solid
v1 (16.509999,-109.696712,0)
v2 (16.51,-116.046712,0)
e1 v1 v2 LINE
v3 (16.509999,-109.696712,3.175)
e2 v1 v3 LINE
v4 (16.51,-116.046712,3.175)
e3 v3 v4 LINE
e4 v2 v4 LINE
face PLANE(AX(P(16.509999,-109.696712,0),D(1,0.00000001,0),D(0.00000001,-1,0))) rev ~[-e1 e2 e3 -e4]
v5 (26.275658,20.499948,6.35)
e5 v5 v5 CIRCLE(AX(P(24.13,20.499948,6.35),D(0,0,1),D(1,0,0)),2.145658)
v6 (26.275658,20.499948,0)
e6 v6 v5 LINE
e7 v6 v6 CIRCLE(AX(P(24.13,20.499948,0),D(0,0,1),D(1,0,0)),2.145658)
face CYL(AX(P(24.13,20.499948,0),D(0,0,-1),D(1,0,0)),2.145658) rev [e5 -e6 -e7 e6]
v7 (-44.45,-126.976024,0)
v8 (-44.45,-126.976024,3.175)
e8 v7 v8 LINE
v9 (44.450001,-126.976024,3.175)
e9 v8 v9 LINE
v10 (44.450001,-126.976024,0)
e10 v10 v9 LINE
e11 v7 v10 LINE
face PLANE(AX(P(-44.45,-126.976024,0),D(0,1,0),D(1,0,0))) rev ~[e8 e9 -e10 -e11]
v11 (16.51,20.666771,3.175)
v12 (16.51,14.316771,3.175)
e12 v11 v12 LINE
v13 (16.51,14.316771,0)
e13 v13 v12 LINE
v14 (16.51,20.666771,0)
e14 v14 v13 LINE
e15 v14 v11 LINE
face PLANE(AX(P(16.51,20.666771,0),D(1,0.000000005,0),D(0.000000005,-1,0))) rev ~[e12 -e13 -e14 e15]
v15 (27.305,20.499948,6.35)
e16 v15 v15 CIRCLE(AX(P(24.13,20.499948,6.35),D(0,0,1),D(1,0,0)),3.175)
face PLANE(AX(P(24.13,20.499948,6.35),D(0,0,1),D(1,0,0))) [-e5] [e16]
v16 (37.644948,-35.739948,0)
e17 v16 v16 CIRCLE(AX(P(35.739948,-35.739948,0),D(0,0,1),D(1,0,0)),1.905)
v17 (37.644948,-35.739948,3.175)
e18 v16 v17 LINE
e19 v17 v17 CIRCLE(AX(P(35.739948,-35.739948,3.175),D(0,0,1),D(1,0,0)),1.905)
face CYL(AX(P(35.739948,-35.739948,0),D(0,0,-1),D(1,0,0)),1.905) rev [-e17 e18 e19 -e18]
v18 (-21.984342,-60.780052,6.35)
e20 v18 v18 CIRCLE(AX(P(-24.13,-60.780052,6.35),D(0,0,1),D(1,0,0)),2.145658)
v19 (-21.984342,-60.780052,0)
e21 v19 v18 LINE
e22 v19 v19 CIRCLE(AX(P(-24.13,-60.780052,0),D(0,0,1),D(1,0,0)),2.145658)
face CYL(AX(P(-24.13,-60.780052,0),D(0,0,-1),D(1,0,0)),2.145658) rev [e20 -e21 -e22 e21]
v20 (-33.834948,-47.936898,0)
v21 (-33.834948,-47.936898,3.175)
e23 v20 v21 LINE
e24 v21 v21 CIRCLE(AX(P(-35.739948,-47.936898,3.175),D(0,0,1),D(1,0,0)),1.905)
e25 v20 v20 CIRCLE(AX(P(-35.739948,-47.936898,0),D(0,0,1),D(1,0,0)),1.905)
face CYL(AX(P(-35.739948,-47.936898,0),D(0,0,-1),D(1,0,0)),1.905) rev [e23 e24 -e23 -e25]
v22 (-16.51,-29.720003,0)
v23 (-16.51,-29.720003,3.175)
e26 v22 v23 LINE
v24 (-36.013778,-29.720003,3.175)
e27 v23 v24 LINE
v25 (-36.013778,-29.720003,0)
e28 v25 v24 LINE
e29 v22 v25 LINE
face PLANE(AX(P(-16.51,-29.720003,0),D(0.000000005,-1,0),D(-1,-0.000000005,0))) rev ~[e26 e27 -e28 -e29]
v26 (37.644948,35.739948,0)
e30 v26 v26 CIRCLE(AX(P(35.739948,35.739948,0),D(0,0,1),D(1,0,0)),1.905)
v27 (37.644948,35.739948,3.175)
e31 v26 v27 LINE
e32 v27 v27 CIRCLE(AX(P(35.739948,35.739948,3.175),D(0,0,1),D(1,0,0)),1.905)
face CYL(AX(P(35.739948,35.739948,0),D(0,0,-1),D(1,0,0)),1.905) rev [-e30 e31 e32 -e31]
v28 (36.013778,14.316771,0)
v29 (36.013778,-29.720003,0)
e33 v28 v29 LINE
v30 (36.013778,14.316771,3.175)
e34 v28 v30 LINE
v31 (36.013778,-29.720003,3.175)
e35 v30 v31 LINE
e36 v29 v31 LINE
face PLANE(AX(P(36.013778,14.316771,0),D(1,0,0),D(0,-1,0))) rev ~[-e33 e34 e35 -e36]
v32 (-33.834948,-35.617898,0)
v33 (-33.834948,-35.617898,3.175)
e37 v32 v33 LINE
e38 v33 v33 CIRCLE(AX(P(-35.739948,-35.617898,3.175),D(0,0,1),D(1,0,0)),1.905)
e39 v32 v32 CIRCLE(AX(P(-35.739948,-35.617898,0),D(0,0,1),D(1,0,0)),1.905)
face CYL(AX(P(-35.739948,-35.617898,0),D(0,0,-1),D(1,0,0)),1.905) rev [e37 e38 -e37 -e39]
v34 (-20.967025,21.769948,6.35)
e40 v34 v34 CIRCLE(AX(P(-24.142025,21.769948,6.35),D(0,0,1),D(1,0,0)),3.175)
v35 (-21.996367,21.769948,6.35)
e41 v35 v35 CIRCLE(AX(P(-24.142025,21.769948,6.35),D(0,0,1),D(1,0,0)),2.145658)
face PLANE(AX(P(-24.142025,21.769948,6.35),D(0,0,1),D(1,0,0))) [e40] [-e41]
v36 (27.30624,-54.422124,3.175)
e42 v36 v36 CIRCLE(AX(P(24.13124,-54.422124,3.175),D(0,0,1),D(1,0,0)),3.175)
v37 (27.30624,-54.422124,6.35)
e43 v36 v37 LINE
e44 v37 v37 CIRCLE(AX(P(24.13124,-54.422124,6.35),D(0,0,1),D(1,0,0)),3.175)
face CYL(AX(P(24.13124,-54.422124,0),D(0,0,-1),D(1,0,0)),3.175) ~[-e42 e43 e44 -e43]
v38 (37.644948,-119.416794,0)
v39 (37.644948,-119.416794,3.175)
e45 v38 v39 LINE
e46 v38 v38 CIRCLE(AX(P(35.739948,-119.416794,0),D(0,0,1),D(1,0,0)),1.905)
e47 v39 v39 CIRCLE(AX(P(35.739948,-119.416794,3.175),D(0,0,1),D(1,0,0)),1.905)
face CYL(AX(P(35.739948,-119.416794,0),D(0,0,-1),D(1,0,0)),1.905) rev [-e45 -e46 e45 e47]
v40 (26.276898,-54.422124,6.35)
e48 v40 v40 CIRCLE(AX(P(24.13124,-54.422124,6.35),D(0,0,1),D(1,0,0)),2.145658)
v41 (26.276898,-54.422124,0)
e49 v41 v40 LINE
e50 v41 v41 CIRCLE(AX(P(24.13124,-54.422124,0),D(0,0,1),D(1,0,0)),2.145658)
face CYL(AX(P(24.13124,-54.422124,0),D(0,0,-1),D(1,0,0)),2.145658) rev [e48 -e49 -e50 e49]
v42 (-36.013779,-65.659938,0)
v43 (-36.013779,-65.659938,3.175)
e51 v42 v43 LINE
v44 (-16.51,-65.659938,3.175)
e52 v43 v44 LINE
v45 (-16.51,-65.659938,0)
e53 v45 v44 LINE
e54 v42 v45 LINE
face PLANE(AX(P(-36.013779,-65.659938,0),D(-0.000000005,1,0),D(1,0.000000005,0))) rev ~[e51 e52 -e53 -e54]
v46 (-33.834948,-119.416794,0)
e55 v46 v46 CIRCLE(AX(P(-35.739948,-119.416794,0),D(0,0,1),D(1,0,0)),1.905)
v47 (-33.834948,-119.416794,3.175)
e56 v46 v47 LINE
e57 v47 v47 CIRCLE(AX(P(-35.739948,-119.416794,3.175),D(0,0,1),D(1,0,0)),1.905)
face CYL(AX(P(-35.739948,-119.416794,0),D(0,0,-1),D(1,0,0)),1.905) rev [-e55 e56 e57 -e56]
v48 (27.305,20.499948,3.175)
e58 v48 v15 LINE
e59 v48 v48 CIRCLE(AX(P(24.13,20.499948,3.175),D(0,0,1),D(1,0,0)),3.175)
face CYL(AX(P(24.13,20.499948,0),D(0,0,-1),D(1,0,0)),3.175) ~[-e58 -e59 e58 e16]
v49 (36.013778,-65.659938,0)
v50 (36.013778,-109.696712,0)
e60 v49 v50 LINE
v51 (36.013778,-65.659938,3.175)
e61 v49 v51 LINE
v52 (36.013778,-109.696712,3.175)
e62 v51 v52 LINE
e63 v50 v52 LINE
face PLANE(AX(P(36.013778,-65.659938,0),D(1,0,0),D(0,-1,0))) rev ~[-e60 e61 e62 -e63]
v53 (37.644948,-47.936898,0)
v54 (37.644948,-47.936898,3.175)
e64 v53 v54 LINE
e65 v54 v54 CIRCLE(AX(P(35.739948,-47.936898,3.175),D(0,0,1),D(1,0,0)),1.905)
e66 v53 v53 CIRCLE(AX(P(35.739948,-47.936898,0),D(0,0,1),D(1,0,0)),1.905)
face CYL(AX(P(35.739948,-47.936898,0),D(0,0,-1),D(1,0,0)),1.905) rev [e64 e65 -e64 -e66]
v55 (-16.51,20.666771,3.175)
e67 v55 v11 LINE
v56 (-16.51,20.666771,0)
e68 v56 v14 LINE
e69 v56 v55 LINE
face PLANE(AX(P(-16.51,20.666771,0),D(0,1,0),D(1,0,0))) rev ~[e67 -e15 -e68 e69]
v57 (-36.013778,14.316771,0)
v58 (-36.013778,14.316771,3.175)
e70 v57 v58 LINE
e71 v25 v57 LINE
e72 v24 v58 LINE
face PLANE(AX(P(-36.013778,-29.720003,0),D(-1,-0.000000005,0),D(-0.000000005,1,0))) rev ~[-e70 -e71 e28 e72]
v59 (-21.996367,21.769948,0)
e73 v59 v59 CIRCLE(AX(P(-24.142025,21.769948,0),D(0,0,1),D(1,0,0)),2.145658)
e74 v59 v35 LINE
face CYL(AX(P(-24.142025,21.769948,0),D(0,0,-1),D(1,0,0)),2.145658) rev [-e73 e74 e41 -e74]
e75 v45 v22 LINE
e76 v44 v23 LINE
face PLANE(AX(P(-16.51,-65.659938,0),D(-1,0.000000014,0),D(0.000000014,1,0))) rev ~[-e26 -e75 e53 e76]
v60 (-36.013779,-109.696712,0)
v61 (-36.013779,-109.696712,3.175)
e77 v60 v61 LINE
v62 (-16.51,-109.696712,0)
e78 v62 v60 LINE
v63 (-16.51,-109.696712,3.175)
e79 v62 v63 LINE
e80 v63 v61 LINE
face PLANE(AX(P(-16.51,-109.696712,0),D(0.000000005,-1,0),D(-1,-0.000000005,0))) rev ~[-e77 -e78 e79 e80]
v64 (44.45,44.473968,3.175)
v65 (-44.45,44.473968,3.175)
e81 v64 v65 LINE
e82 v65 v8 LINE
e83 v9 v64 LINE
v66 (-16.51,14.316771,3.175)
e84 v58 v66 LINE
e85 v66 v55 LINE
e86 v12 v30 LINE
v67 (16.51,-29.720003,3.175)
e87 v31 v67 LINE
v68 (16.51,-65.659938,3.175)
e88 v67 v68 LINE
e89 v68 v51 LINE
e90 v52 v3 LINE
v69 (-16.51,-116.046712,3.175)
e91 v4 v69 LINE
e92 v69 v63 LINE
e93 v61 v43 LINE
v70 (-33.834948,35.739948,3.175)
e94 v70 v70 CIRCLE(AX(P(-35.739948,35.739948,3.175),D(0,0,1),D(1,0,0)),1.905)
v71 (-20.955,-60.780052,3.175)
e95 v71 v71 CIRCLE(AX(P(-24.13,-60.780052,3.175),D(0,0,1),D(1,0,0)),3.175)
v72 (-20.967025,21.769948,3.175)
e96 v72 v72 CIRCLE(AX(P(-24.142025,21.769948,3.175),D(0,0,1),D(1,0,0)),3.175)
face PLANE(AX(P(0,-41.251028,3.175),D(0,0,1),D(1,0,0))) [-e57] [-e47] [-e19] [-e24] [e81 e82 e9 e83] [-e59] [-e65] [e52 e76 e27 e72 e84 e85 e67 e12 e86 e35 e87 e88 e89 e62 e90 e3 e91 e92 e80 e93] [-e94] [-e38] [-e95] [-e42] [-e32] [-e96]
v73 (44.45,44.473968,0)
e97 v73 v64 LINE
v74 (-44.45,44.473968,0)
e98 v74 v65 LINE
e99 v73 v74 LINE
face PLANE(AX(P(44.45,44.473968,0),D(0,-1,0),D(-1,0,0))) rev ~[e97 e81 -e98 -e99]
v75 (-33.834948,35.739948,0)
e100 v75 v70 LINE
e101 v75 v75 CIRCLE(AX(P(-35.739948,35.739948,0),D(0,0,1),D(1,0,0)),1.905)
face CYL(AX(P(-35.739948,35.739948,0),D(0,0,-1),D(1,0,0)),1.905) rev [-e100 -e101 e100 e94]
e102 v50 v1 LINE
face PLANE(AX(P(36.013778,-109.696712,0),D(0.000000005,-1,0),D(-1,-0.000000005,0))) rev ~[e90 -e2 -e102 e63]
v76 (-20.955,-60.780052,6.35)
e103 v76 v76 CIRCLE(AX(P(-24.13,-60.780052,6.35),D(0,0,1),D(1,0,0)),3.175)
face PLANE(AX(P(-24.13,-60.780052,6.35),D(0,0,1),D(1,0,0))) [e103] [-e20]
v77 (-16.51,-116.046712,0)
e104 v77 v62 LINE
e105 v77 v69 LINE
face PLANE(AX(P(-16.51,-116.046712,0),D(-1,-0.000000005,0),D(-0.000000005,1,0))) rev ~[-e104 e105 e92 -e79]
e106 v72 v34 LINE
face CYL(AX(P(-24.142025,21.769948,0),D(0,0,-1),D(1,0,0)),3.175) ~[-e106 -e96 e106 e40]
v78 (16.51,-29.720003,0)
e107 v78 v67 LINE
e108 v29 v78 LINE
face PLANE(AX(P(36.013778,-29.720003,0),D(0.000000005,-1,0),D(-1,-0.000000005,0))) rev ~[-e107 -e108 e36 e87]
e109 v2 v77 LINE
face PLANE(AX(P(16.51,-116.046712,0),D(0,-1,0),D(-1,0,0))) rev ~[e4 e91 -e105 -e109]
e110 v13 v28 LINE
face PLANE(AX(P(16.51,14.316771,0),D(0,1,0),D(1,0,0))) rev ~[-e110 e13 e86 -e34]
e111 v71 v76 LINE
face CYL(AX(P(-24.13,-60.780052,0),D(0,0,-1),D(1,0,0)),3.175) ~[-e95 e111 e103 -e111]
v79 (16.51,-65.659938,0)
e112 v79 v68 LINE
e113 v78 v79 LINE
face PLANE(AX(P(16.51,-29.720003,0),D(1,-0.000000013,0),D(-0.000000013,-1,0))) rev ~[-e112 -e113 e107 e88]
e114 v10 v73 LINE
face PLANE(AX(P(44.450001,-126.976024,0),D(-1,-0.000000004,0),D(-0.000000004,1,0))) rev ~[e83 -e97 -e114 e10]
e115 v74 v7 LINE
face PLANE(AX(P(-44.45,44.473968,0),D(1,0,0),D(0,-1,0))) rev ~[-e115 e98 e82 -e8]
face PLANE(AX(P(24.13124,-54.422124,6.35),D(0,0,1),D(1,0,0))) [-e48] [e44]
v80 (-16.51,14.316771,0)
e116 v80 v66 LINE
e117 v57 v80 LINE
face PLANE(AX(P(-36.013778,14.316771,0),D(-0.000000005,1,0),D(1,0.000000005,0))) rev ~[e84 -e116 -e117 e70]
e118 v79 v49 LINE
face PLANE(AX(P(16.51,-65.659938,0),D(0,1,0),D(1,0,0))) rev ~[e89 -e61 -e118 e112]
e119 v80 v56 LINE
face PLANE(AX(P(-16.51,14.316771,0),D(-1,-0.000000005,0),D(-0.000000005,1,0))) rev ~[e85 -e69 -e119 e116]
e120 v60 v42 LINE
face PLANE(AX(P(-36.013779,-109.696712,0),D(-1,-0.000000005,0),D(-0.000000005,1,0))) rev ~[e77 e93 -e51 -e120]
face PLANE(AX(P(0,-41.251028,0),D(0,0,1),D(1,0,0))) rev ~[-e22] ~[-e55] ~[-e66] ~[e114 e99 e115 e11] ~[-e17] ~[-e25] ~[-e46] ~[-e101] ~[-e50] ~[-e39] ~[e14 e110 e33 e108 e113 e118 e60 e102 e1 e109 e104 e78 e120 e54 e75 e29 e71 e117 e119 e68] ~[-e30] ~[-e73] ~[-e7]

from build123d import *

# Parameters (mm, degrees)
F0_R     = 1.905
F0_R_2   = 3.175
F1_DEPTH = 3.175
F0_R_3   = 2.1456580426
F2_DEPTH = 6.35


# Not quite as in the source:
# - ends of sketch curves that miss each other by under 0.0002 mm in the source are joined


with BuildPart() as f1:
    # F0 (on Top) → F1 (new body)
    with BuildSketch(Plane.XY):
        Polygon((44.45, 44.4739684463), (-44.45, 44.4739684463), (-44.45, -126.9760241032), (44.4500006139, -126.9760241032), align=None)
        with Locations((-35.7399480417, -119.4167938083)):
            Circle(F0_R, mode=Mode.SUBTRACT)
        with Locations((-35.7399480417, -47.9368977249)):
            Circle(F0_R, mode=Mode.SUBTRACT)
        with Locations((-24.13, -60.7800519583)):
            Circle(F0_R_2, mode=Mode.SUBTRACT)
        Polygon((-16.5099999687, 14.3167711779), (-16.5099999992, 20.6667711779), (16.5100000008, 20.6667711779), (16.5100000313, 14.3167711779), (36.0137783311, 14.3167711779), (36.0137783311, -29.7200025995), (16.5100000008, -29.7200026932), (16.5099995171, -65.6599379314), (36.013777817, -65.6599379314), (36.013777817, -109.6967117089), (16.5099994866, -109.6967118025), (16.5099995476, -116.0467118025), (-16.5100004524, -116.0467118025), (-16.5100004829, -109.6967118025), (-36.0137786019, -109.6967118961), (-36.0137788132, -65.659938025), (-16.5100004829, -65.6599379314), (-16.5099999687, -29.7200026932), (-36.0137780877, -29.7200027868), (-36.0137782991, 14.3167710843), align=None, mode=Mode.SUBTRACT)
        with Locations((35.7399480417, -119.4167938083)):
            Circle(F0_R, mode=Mode.SUBTRACT)
        with Locations((24.1312399077, -54.422124289)):
            Circle(F0_R_2, mode=Mode.SUBTRACT)
        with Locations((35.7399480417, -47.9368977249)):
            Circle(F0_R, mode=Mode.SUBTRACT)
        with Locations((-35.7399480417, -35.6178977249)):
            Circle(F0_R, mode=Mode.SUBTRACT)
        with Locations((-24.142025454, 21.7699480417)):
            Circle(F0_R_2, mode=Mode.SUBTRACT)
        with Locations((-35.7399480417, 35.7399480417)):
            Circle(F0_R, mode=Mode.SUBTRACT)
        with Locations((35.7399480417, -35.7399480417)):
            Circle(F0_R, mode=Mode.SUBTRACT)
        with Locations((24.13, 20.4999480417)):
            Circle(F0_R_2, mode=Mode.SUBTRACT)
        with Locations((35.7399480417, 35.7399480417)):
            Circle(F0_R, mode=Mode.SUBTRACT)
    extrude(amount=F1_DEPTH)

    # F0 (on Top) → F2 (join)
    with BuildSketch(Plane.XY):
        with Locations((-24.13, -60.7800519583)):
            Circle(F0_R_2)
        with Locations((-24.13, -60.7800519583)):
            Circle(F0_R_3, mode=Mode.SUBTRACT)
        with Locations((-24.142025454, 21.7699480417)):
            Circle(F0_R_2)
        with Locations((-24.142025454, 21.7699480417)):
            Circle(F0_R_3, mode=Mode.SUBTRACT)
        with Locations((24.1312399077, -54.422124289)):
            Circle(F0_R_2)
        with Locations((24.1312399077, -54.422124289)):
            Circle(F0_R_3, mode=Mode.SUBTRACT)
        with Locations((24.13, 20.4999480417)):
            Circle(F0_R_2)
        with Locations((24.13, 20.4999480417)):
            Circle(F0_R_3, mode=Mode.SUBTRACT)
    extrude(amount=F2_DEPTH)


solid = f1.part
